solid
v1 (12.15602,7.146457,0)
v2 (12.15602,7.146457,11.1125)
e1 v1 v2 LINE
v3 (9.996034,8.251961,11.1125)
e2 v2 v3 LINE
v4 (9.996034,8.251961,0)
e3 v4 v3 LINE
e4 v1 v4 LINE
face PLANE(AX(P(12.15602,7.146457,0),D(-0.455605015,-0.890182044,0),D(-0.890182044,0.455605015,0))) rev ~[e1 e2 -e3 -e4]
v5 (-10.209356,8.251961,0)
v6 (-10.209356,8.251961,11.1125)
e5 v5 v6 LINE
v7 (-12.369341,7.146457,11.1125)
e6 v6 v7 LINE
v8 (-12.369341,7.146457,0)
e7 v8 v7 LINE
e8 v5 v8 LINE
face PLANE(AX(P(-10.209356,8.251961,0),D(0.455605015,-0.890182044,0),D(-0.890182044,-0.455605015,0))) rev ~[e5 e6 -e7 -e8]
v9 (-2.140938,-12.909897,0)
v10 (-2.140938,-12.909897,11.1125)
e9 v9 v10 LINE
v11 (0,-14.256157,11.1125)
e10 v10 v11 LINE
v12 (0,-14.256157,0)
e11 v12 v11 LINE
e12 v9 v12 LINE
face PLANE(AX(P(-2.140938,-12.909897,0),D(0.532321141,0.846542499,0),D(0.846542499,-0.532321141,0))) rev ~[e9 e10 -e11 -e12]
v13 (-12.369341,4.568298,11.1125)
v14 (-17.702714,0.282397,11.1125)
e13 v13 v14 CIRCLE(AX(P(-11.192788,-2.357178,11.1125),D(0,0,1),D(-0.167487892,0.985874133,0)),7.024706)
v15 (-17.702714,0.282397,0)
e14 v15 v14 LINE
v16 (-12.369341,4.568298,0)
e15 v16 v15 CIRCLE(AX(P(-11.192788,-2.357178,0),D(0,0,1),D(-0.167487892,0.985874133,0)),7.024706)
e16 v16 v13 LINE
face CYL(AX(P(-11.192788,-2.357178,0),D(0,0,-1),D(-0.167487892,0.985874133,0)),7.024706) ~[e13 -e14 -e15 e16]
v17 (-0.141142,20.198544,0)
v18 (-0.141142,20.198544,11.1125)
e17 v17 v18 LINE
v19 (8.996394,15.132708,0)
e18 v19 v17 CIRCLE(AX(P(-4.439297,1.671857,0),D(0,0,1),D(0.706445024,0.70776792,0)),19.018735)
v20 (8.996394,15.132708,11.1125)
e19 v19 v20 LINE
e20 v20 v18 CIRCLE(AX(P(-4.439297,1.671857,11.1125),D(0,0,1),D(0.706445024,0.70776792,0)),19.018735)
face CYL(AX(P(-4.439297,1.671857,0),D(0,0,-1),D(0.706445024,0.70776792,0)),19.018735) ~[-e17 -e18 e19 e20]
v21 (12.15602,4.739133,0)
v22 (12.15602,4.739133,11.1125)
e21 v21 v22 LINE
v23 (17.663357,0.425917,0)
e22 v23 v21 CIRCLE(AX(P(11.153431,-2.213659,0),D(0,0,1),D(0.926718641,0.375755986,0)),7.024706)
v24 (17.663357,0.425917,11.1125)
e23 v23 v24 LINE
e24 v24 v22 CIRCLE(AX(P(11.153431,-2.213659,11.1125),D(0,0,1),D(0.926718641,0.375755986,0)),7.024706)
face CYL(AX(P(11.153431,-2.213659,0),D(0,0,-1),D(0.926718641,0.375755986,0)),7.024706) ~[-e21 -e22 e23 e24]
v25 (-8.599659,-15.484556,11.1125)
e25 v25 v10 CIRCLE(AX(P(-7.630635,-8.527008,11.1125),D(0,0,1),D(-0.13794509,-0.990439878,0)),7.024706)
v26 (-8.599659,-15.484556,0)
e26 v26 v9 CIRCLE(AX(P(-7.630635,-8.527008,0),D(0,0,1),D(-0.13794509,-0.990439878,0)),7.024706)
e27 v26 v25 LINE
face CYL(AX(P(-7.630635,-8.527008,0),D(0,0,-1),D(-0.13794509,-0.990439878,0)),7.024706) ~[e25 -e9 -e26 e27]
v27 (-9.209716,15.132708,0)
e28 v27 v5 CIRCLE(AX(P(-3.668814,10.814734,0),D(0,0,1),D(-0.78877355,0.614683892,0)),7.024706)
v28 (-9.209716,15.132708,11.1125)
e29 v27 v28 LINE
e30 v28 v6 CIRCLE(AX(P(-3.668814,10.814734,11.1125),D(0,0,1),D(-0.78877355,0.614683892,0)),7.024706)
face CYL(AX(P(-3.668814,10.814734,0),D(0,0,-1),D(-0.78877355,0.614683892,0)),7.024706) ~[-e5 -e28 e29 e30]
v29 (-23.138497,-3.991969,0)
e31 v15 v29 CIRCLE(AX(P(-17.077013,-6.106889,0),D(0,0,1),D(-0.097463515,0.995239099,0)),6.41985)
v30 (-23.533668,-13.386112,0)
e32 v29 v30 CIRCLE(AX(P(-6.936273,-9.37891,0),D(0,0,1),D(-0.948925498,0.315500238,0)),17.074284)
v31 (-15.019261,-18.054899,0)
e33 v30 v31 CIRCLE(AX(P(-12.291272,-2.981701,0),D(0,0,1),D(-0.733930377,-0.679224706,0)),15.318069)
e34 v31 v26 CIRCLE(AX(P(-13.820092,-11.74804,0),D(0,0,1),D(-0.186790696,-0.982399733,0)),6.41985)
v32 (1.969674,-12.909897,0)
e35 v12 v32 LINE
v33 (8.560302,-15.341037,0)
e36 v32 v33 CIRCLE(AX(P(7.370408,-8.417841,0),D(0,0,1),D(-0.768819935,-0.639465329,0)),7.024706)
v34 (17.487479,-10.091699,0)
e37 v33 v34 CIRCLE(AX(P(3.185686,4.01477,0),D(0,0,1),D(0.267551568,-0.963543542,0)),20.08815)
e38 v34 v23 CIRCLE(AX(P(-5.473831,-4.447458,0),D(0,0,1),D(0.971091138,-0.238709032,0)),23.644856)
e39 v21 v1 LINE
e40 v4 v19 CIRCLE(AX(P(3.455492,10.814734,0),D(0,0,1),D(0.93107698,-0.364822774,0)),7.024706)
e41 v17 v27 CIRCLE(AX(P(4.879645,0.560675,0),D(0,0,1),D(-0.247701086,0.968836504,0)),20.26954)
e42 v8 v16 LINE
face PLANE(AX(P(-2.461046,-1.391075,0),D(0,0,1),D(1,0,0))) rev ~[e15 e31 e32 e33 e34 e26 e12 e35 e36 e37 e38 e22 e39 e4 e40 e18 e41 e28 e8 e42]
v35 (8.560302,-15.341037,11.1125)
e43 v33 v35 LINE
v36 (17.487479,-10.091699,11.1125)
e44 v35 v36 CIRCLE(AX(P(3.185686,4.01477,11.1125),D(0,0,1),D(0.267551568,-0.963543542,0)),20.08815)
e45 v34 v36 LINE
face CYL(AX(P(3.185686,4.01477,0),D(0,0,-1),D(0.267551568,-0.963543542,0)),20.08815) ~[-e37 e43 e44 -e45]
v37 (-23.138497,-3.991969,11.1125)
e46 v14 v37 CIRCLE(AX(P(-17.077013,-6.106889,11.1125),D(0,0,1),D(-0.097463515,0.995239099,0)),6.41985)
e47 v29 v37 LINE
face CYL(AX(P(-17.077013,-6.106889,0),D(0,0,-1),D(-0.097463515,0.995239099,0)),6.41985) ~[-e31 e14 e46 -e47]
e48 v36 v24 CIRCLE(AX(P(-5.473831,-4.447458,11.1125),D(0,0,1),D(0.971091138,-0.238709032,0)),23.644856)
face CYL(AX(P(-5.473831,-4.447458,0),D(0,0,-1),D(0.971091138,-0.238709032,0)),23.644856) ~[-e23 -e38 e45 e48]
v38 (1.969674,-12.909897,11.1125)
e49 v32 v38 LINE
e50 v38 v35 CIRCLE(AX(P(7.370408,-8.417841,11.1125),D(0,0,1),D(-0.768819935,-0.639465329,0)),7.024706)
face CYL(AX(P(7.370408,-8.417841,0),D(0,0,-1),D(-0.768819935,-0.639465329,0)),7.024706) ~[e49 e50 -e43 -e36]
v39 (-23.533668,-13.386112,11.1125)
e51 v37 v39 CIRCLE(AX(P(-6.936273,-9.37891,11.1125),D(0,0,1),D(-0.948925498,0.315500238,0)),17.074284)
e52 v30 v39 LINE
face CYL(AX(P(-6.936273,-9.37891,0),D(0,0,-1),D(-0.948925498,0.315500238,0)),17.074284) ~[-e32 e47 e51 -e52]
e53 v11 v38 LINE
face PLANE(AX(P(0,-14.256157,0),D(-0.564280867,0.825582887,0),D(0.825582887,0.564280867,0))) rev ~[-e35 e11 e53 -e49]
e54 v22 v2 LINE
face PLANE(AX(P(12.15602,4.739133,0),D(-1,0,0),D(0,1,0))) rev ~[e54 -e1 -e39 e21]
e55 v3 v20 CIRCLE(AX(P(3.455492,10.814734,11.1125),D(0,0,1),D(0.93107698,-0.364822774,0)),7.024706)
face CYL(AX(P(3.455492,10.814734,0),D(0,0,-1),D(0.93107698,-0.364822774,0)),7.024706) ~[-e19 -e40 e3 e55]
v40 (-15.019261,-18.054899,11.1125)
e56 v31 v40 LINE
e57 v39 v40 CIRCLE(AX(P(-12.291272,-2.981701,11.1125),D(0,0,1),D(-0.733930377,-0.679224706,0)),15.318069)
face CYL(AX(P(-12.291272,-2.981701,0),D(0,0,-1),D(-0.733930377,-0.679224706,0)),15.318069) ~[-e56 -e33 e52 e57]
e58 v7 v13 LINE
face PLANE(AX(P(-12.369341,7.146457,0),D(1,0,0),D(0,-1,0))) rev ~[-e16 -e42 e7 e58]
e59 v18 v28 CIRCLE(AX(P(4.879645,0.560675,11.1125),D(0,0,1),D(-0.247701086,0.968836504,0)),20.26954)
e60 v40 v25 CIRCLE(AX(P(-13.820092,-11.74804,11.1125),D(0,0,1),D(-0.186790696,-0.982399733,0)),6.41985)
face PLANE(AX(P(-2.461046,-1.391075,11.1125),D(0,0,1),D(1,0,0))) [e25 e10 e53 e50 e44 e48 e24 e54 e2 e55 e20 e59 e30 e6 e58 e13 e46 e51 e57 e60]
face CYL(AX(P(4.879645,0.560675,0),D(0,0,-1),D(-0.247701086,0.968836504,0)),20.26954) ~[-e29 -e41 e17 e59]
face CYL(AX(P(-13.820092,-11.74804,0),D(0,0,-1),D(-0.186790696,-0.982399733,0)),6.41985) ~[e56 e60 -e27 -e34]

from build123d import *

# Parameters (mm, degrees)
F1_DEPTH = 11.1125


# Not quite as in the source:
# - a length typed as a fraction of an inch, garbled in the dataset ("3 / 203.2 mm" for 3/8 in), is restored


with BuildPart() as f1:
    # F0 (on Top) → F1 (new body)
    with BuildSketch(Plane.XY):
        with BuildLine():
            ThreePointArc((-0.1411418198, 20.1985444874), (-5.0054503986, 18.2564119782), (-9.2097157612, 15.1327075437))
            ThreePointArc((-9.2097157612, 15.1327075437), (-10.6205392688, 11.8246856933), (-10.2093555033, 8.2519613206))
            Line((-10.2093555033, 8.2519613206), (-12.369341217, 7.1464567445))
            Line((-12.369341217, 7.1464567445), (-12.369341217, 4.6386048198))
            Line((-12.369341217, 4.6386048198), (-12.369341217, 4.5682978211))
            ThreePointArc((-12.369341217, 4.5682978211), (-15.5930977879, 3.1185654947), (-17.7027139134, 0.2823972963))
            ThreePointArc((-17.7027139134, 0.2823972963), (-21.0452825194, -1.0603738309), (-23.1384971151, -3.9919692741))
            ThreePointArc((-23.1384971151, -3.9919692741), (-23.9954710425, -8.6613028545), (-23.5336683691, -13.3861117065))
            ThreePointArc((-23.5336683691, -13.3861117065), (-19.6562098094, -16.4130421994), (-15.0192606046, -18.054899429))
            ThreePointArc((-15.0192606046, -18.054899429), (-11.4338171794, -17.7079201351), (-8.5996589687, -15.484556372))
            ThreePointArc((-8.5996589687, -15.484556372), (-5.0294162563, -15.0523544446), (-2.1409380715, -12.9098966718))
            Line((-2.1409380715, -12.9098966718), (0, -14.2561570176))
            Line((0, -14.2561570176), (1.9696742658, -12.9098966718))
            ThreePointArc((1.9696742658, -12.9098966718), (4.9392756736, -15.0084468105), (8.560301624, -15.3410370587))
            ThreePointArc((8.560301624, -15.3410370587), (13.367982191, -13.3015402533), (17.4874793738, -10.0916987285))
            ThreePointArc((17.4874793738, -10.0916987285), (18.16772005, -4.8427956267), (17.6633565687, 0.4259166096))
            ThreePointArc((17.6633565687, 0.4259166096), (15.4847616458, 3.3168082822), (12.1560195839, 4.739132713))
            Line((12.1560195839, 4.739132713), (12.1560195839, 7.1464567445))
            Line((12.1560195839, 7.1464567445), (9.9960338703, 8.2519613206))
            ThreePointArc((9.9960338703, 8.2519613206), (10.4072176357, 11.8246856933), (8.9963941282, 15.1327075437))
            ThreePointArc((8.9963941282, 15.1327075437), (4.7823081966, 18.3053860292), (-0.1411418198, 20.1985444874))
        make_face()
    extrude(amount=F1_DEPTH)


solid = f1.part
